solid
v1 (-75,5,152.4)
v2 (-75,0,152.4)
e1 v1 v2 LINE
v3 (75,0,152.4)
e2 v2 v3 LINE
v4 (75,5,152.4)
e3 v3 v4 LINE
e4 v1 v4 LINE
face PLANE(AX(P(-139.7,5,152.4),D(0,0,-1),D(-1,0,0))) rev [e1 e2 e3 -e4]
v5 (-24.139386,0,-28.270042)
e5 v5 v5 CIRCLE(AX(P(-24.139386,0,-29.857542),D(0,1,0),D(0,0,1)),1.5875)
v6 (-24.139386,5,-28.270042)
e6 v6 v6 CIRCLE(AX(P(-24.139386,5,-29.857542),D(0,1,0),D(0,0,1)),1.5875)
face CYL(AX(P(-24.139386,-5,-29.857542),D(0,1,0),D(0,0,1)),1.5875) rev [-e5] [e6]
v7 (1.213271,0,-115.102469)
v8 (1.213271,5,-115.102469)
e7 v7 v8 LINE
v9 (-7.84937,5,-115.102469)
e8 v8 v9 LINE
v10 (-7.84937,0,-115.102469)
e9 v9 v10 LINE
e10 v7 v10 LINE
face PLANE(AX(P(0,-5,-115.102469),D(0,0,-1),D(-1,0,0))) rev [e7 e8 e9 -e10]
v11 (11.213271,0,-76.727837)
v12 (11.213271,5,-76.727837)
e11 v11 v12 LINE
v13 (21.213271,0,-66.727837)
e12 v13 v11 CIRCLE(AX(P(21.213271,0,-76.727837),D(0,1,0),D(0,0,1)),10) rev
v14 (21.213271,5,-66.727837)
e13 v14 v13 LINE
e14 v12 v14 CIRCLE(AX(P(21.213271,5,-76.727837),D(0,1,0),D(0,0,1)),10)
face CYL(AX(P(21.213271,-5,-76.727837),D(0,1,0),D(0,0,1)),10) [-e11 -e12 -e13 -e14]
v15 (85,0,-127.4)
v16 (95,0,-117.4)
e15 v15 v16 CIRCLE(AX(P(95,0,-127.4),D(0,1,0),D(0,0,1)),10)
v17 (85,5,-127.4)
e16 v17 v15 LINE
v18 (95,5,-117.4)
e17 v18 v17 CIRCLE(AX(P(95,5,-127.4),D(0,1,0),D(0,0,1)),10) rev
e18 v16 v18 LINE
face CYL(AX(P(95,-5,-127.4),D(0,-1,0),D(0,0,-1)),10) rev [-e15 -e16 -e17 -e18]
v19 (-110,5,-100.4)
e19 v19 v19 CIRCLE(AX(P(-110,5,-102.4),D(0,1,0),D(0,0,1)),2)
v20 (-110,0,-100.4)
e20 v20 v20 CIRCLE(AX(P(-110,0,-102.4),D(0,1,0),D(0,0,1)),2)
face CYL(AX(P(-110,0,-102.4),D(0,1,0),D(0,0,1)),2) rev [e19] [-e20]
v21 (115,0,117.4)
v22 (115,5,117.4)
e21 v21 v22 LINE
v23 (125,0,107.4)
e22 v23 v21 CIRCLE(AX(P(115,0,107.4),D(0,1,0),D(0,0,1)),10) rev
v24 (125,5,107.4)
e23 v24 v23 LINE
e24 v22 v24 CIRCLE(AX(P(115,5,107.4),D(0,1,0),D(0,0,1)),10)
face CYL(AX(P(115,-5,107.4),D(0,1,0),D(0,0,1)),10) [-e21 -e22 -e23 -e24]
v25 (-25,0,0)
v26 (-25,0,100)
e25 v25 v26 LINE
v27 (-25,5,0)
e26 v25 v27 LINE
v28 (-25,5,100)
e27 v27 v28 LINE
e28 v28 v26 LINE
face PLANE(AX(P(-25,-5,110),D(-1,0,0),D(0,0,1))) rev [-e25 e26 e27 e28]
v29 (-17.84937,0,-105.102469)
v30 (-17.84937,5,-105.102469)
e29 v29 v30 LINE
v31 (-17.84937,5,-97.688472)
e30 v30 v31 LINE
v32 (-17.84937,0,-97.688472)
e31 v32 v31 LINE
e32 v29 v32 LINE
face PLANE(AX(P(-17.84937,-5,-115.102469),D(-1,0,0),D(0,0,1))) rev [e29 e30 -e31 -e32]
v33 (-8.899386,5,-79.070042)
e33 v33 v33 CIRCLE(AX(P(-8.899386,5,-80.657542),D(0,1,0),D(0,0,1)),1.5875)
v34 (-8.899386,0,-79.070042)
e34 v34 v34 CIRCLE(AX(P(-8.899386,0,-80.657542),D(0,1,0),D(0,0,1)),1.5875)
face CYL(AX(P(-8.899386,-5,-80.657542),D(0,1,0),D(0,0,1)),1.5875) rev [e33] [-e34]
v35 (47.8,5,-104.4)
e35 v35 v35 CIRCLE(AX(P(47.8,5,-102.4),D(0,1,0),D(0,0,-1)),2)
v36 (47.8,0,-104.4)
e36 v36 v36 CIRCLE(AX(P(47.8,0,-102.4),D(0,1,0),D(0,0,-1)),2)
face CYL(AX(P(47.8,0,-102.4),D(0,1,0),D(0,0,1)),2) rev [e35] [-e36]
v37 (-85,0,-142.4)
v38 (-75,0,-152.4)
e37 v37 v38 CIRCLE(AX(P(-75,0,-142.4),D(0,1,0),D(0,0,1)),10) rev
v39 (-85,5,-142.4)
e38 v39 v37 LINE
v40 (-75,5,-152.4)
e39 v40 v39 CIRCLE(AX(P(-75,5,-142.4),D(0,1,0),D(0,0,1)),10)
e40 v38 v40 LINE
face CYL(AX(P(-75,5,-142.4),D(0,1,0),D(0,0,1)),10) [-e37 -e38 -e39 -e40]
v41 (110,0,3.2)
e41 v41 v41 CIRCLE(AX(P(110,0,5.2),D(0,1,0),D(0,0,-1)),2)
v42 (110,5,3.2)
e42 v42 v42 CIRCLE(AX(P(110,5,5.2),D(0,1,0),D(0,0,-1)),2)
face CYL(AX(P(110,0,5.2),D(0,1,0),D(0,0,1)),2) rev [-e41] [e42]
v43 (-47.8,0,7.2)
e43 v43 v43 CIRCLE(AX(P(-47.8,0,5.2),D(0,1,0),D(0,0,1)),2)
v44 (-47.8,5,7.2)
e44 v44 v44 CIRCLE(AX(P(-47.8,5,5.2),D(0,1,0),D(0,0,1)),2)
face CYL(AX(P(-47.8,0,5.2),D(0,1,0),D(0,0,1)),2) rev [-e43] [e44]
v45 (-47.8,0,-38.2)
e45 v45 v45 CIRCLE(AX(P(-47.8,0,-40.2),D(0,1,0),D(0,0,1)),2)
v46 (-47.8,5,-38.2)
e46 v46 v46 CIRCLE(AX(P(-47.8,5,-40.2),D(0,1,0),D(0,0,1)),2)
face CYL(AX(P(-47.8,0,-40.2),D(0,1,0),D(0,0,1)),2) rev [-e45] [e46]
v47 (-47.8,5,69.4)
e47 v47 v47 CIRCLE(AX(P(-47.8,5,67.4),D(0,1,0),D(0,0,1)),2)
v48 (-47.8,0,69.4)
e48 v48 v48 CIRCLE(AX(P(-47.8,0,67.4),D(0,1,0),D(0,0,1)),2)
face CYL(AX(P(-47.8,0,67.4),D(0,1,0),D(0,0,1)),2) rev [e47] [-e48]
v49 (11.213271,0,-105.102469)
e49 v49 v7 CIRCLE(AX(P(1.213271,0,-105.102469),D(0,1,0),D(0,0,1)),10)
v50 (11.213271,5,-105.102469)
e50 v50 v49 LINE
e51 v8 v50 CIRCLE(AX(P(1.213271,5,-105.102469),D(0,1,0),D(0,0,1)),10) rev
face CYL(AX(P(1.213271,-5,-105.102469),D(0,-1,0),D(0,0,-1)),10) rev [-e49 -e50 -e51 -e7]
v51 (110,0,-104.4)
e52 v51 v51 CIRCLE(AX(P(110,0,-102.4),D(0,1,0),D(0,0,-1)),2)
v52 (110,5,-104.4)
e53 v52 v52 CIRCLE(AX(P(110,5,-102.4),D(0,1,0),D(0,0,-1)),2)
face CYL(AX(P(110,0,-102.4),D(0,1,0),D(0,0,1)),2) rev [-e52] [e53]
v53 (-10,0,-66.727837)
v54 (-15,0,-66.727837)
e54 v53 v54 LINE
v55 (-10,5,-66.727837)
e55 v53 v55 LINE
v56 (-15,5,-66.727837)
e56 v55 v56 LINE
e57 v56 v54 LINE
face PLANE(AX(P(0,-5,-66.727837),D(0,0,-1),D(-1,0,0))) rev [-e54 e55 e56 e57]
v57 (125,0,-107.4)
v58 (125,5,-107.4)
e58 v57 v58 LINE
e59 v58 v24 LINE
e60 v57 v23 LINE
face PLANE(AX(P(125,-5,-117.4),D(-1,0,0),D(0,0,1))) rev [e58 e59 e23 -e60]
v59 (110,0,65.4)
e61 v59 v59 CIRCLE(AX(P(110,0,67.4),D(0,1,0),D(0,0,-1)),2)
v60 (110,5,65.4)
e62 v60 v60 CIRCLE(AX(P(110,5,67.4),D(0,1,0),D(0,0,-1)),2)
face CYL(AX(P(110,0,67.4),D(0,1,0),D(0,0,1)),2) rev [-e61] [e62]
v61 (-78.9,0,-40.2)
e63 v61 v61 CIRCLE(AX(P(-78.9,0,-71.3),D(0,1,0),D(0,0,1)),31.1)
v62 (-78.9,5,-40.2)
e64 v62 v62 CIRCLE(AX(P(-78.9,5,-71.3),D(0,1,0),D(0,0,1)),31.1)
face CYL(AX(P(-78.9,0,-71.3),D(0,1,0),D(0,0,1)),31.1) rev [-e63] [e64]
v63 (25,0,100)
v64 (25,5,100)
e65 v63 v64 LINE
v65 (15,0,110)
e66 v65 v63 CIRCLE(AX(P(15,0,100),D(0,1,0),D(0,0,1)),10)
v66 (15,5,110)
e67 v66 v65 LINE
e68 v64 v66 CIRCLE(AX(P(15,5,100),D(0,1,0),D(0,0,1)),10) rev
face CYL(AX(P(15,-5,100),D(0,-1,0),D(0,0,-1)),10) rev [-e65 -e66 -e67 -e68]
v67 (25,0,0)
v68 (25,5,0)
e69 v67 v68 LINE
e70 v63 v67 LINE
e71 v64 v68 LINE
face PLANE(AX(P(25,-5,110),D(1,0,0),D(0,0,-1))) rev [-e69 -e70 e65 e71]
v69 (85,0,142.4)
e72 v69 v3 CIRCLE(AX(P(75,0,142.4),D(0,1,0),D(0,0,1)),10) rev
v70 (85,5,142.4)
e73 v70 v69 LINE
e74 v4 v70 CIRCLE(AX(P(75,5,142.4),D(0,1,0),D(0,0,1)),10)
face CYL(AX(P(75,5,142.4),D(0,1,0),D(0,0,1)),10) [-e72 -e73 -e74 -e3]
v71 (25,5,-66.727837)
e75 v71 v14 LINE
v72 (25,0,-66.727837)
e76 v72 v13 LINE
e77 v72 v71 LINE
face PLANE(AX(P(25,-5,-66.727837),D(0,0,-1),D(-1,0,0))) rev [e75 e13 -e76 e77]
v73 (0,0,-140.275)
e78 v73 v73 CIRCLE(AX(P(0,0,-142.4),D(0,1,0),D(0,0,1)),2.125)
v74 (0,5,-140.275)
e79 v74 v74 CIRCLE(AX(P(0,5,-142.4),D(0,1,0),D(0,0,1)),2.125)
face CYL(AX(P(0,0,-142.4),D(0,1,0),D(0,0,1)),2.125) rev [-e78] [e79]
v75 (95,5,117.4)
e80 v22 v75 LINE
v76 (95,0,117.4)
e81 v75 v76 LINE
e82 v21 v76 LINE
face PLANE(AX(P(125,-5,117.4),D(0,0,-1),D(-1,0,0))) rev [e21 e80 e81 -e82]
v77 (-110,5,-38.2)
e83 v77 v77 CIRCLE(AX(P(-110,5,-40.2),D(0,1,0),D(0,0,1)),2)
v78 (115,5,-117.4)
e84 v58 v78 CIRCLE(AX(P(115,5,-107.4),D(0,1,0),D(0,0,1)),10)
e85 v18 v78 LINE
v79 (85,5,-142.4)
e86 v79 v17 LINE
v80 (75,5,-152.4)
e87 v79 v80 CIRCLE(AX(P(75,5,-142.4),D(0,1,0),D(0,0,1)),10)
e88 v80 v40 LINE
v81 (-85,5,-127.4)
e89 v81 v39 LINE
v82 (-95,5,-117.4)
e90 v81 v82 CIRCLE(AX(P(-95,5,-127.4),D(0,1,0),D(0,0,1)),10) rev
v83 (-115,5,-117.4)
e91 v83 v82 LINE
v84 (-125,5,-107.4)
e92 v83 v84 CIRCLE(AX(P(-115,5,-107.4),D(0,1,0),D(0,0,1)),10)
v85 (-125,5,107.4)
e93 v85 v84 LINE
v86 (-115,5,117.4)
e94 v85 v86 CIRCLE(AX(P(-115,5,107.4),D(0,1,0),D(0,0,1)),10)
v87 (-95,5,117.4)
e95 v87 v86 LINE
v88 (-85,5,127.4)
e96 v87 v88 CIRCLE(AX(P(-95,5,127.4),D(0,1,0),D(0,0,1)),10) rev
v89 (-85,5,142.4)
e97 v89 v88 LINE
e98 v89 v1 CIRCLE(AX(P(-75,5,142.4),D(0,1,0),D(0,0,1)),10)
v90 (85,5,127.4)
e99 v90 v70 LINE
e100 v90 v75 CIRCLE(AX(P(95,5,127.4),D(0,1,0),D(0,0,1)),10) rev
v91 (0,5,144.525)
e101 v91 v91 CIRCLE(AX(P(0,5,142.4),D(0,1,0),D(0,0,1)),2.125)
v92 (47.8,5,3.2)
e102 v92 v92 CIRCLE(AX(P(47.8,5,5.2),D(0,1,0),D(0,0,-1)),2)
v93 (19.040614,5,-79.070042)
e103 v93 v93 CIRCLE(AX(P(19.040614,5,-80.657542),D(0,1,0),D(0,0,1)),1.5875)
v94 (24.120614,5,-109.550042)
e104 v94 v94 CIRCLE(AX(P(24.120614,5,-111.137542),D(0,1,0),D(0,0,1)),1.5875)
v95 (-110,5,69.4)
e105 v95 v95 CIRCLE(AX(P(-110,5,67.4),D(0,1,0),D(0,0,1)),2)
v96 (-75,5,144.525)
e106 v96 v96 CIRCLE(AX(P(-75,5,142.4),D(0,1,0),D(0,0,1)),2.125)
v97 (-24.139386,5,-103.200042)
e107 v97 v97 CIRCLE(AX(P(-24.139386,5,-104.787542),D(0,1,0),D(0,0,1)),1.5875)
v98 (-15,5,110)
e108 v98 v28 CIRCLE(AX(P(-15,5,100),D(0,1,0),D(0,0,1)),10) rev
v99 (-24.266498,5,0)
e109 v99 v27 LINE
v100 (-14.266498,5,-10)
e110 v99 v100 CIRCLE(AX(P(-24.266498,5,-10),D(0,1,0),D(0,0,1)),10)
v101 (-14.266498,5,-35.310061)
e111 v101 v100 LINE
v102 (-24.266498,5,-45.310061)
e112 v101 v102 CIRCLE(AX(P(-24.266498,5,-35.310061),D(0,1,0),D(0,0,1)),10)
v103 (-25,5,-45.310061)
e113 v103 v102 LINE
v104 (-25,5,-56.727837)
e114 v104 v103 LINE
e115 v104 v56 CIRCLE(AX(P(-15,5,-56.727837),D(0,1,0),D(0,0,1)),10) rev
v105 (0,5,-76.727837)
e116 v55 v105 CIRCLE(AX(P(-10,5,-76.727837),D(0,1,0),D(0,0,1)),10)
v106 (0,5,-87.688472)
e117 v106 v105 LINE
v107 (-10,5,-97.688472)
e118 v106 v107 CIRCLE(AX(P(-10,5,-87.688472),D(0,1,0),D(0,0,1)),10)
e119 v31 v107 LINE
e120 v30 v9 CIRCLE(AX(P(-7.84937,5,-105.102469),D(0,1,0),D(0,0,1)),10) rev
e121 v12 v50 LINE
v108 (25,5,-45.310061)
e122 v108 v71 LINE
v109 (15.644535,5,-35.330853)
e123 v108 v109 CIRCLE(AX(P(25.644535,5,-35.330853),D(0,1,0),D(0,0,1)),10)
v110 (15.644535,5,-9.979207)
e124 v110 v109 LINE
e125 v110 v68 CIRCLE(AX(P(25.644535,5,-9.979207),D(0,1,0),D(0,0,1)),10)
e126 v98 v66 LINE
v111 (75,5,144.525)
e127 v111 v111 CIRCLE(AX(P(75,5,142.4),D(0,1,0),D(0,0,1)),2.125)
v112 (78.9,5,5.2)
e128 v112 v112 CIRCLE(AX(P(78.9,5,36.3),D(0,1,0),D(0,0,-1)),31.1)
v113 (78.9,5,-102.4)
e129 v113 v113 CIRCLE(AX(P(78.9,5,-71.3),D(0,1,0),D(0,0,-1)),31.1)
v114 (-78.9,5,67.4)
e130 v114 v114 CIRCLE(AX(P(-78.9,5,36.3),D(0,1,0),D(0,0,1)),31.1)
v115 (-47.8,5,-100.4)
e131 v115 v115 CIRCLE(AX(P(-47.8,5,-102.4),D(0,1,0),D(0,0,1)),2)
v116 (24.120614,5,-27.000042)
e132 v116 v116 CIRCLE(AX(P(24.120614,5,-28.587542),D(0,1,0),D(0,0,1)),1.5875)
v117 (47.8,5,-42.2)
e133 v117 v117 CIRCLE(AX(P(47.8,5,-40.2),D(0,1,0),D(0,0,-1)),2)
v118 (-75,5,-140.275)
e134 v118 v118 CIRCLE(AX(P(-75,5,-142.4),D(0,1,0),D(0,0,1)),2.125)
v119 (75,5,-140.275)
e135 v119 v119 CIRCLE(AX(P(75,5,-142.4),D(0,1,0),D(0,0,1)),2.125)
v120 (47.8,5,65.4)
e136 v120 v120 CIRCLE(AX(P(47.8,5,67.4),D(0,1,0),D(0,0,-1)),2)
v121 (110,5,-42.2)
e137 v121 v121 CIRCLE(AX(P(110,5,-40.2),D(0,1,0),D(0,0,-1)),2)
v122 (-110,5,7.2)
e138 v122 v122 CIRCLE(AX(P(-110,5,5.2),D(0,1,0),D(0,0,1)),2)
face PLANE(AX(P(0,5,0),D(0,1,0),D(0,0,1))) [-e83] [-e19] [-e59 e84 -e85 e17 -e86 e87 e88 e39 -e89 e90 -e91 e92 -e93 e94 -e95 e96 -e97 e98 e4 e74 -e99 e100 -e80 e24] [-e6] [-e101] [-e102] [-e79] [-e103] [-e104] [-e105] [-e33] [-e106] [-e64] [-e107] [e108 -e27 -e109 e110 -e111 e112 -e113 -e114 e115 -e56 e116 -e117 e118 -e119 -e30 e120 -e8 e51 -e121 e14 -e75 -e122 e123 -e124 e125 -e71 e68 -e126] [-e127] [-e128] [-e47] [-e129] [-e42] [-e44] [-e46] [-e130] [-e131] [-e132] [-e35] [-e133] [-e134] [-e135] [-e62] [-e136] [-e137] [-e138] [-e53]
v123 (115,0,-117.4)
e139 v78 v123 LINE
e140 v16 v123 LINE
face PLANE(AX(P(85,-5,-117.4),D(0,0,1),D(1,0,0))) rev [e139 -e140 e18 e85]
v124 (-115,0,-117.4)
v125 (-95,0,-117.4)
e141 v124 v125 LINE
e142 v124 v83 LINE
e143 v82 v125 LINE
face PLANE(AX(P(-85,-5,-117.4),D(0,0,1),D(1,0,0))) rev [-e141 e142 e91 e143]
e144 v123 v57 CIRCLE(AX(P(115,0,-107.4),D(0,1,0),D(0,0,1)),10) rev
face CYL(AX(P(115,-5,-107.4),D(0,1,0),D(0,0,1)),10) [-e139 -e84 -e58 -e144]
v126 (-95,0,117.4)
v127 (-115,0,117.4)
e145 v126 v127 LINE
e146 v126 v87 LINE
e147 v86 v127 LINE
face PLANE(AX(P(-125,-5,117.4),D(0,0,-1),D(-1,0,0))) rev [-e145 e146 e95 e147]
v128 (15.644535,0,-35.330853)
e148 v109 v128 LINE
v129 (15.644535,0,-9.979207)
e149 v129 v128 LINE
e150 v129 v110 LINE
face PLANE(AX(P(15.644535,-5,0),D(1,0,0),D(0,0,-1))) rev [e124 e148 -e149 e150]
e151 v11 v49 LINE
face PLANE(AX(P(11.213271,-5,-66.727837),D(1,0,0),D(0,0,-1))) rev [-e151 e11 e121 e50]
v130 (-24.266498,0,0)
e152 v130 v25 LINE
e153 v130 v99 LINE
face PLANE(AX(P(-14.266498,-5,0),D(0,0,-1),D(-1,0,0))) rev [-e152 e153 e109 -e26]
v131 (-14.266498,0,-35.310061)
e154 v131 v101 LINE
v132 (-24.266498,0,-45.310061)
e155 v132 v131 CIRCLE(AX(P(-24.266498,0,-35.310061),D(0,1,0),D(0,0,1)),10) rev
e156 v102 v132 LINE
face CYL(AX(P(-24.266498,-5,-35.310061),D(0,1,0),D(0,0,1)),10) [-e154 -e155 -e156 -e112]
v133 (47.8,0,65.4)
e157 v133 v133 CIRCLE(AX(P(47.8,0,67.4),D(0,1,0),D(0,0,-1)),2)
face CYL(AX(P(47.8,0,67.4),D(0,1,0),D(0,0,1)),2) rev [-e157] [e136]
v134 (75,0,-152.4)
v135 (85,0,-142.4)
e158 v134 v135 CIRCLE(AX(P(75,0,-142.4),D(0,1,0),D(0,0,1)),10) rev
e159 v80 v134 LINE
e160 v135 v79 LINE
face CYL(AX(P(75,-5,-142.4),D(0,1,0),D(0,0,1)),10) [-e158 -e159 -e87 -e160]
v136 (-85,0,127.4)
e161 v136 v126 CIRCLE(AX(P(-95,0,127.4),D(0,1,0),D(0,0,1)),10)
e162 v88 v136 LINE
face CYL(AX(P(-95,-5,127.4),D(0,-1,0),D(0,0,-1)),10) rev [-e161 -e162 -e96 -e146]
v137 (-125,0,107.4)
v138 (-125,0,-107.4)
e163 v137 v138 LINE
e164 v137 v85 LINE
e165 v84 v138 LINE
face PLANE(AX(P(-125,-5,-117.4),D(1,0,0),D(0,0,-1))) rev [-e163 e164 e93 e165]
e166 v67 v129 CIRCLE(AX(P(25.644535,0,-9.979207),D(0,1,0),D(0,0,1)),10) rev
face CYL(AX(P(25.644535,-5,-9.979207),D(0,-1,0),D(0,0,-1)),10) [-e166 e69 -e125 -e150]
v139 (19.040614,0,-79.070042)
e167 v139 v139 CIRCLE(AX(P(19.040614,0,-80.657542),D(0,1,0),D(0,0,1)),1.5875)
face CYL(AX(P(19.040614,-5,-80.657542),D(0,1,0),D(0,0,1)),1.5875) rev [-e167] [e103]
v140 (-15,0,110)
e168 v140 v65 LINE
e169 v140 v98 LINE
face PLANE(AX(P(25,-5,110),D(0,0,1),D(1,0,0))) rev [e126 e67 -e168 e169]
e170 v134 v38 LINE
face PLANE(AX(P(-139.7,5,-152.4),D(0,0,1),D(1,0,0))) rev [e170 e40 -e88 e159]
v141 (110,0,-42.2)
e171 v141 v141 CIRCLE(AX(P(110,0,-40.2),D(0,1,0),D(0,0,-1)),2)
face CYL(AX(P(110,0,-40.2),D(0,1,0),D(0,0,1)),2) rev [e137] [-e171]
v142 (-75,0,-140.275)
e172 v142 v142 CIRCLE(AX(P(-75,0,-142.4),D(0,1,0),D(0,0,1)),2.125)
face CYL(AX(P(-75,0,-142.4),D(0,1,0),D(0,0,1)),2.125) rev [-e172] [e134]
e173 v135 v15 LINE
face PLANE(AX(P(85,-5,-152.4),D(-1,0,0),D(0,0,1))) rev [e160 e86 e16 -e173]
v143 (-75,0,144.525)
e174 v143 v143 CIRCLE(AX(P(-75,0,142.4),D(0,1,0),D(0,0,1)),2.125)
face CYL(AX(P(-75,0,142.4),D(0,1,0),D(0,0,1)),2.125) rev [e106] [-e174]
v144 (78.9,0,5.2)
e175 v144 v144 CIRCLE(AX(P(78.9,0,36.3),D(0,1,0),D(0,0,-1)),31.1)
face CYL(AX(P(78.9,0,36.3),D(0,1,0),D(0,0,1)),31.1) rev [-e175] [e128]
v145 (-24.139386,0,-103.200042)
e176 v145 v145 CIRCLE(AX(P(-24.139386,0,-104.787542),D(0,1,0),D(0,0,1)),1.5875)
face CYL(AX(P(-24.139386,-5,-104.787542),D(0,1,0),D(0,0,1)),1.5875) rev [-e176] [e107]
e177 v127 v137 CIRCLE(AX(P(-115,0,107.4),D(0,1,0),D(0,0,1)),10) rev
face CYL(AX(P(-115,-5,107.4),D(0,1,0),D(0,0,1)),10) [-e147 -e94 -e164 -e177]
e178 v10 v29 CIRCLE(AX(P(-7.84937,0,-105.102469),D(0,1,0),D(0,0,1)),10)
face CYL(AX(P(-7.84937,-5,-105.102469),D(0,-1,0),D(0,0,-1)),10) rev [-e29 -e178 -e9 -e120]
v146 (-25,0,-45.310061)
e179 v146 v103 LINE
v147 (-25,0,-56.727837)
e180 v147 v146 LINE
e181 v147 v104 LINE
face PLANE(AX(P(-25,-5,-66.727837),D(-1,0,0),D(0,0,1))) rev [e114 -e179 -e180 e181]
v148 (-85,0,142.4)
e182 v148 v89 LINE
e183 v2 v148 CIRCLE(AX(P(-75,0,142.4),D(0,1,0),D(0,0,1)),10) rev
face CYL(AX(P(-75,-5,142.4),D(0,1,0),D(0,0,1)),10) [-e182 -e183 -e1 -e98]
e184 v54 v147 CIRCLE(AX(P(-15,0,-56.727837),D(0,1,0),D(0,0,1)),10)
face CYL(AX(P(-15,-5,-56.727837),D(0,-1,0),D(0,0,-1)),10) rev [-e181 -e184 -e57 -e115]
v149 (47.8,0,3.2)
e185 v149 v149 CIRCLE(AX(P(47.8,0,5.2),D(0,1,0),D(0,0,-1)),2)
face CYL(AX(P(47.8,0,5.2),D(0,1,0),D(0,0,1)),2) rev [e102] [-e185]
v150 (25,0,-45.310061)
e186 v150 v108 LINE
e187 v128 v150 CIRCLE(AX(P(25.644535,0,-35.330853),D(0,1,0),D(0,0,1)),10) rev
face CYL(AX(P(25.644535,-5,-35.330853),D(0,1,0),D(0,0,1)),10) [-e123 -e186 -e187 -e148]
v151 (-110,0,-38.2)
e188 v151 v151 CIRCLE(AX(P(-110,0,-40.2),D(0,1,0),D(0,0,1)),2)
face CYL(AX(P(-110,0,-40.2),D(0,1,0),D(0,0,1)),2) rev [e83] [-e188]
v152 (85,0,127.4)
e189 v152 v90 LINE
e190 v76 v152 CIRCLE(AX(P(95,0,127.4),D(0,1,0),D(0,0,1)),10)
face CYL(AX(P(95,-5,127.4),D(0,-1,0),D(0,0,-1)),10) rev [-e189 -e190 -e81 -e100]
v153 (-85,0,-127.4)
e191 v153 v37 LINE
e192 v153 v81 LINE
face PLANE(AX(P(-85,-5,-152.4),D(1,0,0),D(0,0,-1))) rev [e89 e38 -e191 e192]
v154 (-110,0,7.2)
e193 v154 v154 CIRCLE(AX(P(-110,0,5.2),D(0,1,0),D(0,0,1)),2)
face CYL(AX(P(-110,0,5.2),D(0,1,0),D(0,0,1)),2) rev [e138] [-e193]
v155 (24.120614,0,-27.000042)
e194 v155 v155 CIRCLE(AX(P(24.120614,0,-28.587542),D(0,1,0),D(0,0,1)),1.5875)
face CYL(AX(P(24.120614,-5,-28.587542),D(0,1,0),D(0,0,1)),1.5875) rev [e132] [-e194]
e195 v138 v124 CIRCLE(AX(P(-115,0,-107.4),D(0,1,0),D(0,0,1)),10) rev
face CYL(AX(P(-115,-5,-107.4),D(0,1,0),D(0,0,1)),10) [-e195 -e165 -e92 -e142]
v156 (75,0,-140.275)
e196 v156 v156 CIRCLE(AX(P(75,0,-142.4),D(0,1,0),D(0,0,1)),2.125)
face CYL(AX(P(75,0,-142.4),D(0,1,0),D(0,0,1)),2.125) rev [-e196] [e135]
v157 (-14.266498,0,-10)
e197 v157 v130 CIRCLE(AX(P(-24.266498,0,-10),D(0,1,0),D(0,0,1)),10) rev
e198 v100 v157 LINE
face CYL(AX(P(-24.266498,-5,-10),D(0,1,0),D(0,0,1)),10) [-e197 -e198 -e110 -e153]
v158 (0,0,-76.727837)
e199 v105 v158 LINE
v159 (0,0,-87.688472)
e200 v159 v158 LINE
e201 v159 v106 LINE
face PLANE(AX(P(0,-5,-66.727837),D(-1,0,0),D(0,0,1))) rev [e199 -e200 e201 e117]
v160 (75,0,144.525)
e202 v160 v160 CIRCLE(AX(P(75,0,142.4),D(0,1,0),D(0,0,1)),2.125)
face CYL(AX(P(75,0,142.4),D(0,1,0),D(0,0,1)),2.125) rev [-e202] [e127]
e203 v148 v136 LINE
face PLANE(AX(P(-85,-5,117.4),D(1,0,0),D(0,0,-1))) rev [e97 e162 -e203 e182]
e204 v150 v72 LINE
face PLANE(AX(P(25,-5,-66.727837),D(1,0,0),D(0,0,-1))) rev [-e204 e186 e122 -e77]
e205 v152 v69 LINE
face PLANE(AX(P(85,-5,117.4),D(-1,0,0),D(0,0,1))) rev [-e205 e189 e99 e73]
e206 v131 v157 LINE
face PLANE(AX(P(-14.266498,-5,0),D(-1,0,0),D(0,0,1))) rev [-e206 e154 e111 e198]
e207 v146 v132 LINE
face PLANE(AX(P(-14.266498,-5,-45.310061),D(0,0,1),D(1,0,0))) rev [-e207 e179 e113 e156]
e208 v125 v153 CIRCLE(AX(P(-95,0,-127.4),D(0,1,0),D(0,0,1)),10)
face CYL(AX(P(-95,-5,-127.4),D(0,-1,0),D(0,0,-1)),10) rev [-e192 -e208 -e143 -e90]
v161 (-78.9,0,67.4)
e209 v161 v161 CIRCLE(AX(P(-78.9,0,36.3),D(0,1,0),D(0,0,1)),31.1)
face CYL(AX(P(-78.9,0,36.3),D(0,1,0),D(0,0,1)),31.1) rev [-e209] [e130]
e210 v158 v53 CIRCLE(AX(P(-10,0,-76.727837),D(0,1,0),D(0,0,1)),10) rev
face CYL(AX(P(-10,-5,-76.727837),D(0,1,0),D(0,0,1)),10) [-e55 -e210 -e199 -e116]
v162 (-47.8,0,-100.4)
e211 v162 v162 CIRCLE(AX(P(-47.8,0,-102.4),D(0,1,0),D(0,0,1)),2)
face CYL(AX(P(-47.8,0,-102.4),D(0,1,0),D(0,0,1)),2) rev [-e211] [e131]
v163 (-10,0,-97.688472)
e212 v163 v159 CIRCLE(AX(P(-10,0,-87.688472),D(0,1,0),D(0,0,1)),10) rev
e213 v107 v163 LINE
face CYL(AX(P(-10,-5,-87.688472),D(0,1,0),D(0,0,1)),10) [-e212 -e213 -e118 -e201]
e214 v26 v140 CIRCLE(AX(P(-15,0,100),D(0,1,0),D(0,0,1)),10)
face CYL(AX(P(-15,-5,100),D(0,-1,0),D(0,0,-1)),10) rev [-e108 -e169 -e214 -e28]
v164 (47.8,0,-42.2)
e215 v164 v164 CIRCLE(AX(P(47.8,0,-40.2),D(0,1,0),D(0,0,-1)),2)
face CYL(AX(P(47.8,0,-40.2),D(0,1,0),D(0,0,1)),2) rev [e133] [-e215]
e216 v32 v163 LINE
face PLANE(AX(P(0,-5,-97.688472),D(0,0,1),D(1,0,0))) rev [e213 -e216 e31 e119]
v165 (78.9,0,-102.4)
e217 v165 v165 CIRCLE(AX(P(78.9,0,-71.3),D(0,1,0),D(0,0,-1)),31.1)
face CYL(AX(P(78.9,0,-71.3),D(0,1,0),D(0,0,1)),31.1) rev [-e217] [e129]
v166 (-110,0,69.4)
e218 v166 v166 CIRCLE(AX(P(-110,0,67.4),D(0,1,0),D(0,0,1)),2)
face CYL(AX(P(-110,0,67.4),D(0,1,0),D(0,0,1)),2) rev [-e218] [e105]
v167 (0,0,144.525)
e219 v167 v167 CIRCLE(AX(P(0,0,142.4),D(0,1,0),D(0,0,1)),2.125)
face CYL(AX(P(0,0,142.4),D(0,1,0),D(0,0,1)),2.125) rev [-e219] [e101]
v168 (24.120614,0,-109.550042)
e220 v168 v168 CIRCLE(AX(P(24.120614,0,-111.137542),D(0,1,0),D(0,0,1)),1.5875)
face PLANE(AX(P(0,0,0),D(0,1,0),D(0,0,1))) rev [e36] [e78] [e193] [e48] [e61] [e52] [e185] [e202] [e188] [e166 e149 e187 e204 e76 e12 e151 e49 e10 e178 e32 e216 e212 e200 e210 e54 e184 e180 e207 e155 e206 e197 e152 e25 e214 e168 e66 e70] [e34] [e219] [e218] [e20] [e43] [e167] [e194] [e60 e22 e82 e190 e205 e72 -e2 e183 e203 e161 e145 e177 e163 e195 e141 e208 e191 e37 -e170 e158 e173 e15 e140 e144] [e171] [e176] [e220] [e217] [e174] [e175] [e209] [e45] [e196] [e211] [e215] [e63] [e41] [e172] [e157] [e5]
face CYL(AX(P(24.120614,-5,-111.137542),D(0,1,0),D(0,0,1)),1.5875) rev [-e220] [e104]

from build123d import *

# Parameters (mm, degrees)
SKETCH1_W           = 279.4
SKETCH1_H           = 304.8
BOSS_EXTRUDE1_DEPTH = 5
CUT_EXTRUDE1_DEPTH  = 10
SKETCH3_R           = 2.125
CUT_EXTRUDE2_DEPTH  = 198.169368818
SKETCH6_R           = 2
SKETCH6_R_2         = 31.1
CUT_EXTRUDE3_DEPTH  = 198.169368818
SKETCH5_R           = 1.5875
CUT_EXTRUDE4_DEPTH  = 10
FILLET1_R           = 10


with BuildPart() as part:
    # Sketch1 → Boss-Extrude1 (new body)
    with BuildSketch(Plane(origin=(0, 0, 0), x_dir=(1, 0, 0), z_dir=(0, 1, 0))):
        Rectangle(SKETCH1_W, SKETCH1_H)
    extrude(amount=BOSS_EXTRUDE1_DEPTH)

    # Sketch2 → Cut-Extrude1 (cut)
    with BuildSketch(Plane(origin=(0, 5, 0), x_dir=(1, 0, 0), z_dir=(0, 1, 0))):
        Polygon((-139.7, 152.4), (-85, 152.4), (-85, 117.4), (-125, 117.4), (-125, -117.4), (-85, -117.4), (-85, -152.4), (-139.7, -152.4), align=None)
        Polygon((139.7, -152.4), (85, -152.4), (85, -117.4), (125, -117.4), (125, 117.4), (85, 117.4), (85, 152.4), (139.7, 152.4), align=None)
    extrude(amount=-CUT_EXTRUDE1_DEPTH, mode=Mode.SUBTRACT)

    # Sketch3 → Cut-Extrude2 (cut, through all)
    with BuildSketch(Plane(origin=(0, 5, 0), x_dir=(1, 0, 0), z_dir=(0, 1, 0))):
        with Locations(Location((-75, 142.4, 0), (0, 0, 270))):
            Circle(SKETCH3_R)
        with Locations(Location((75, 142.4, 0), (0, 0, 270))):
            Circle(SKETCH3_R)
        with Locations(Location((75, -142.4, 0), (0, 0, 270))):
            Circle(SKETCH3_R)
        with Locations(Location((-75, -142.4, 0), (0, 0, 270))):
            Circle(SKETCH3_R)
        with Locations(Location((0, 142.4, 0), (0, 0, 270))):
            Circle(SKETCH3_R)
        with Locations(Location((0, -142.4, 0), (0, 0, 270))):
            Circle(SKETCH3_R)
    extrude(amount=-CUT_EXTRUDE2_DEPTH, mode=Mode.SUBTRACT)

    # Sketch6 → Cut-Extrude3 (cut, through all)
    with BuildSketch(Plane(origin=(0, 5, 0), x_dir=(1, 0, 0), z_dir=(0, 1, 0))):
        with Locations(Location((-110, 102.4, 0), (0, 0, 270))):
            Circle(SKETCH6_R)
        with Locations(Location((-47.8, 102.4, 0), (0, 0, 270))):
            Circle(SKETCH6_R)
        with Locations(Location((-47.8, 40.2, 0), (0, 0, 270))):
            Circle(SKETCH6_R)
        with Locations(Location((-110, 40.2, 0), (0, 0, 270))):
            Circle(SKETCH6_R)
        with Locations(Location((-110, -5.2, 0), (0, 0, 270))):
            Circle(SKETCH6_R)
        with Locations(Location((-47.8, -5.2, 0), (0, 0, 270))):
            Circle(SKETCH6_R)
        with Locations(Location((-47.8, -67.4, 0), (0, 0, 270))):
            Circle(SKETCH6_R)
        with Locations(Location((-110, -67.4, 0), (0, 0, 270))):
            Circle(SKETCH6_R)
        with Locations(Location((-78.9, 71.3, 0), (0, 0, 270))):
            Circle(SKETCH6_R_2)
        with Locations(Location((-78.9, -36.3, 0), (0, 0, 270))):
            Circle(SKETCH6_R_2)
        with Locations(Location((78.9, -36.3, 0), (0, 0, 90))):
            Circle(SKETCH6_R_2)
        with Locations(Location((78.9, 71.3, 0), (0, 0, 90))):
            Circle(SKETCH6_R_2)
        with Locations(Location((110, -67.4, 0), (0, 0, 90))):
            Circle(SKETCH6_R)
        with Locations(Location((47.8, -67.4, 0), (0, 0, 90))):
            Circle(SKETCH6_R)
        with Locations(Location((47.8, -5.2, 0), (0, 0, 90))):
            Circle(SKETCH6_R)
        with Locations(Location((110, -5.2, 0), (0, 0, 90))):
            Circle(SKETCH6_R)
        with Locations(Location((110, 40.2, 0), (0, 0, 90))):
            Circle(SKETCH6_R)
        with Locations(Location((47.8, 40.2, 0), (0, 0, 90))):
            Circle(SKETCH6_R)
        with Locations(Location((47.8, 102.4, 0), (0, 0, 90))):
            Circle(SKETCH6_R)
        with Locations(Location((110, 102.4, 0), (0, 0, 90))):
            Circle(SKETCH6_R)
    extrude(amount=-CUT_EXTRUDE3_DEPTH, mode=Mode.SUBTRACT)

    # Sketch5 → Cut-Extrude4 (cut)
    with BuildSketch(Plane(origin=(0, 5, 0), x_dir=(1, 0, 0), z_dir=(0, 1, 0))):
        with Locations(Location((24.120614372, 111.137541604, 0), (0, 0, 270))):
            Circle(SKETCH5_R)
        with Locations(Location((-24.139385628, 104.787541604, 0), (0, 0, 270))):
            Circle(SKETCH5_R)
        with Locations(Location((-8.899385628, 80.657541604, 0), (0, 0, 270))):
            Circle(SKETCH5_R)
        with Locations(Location((19.040614372, 80.657541604, 0), (0, 0, 270))):
            Circle(SKETCH5_R)
        with Locations(Location((24.120614372, 28.587541604, 0), (0, 0, 270))):
            Circle(SKETCH5_R)
        with Locations(Location((-24.139385628, 29.857541604, 0), (0, 0, 270))):
            Circle(SKETCH5_R)
        Polygon((0, 66.727836804), (-25, 66.727836804), (-25, 45.310060528), (-14.26649767, 45.310060528), (-14.26649767, 0), (-25, 0), (-25, -110), (25, -110), (25, 0), (15.644534715, 0), (15.644534715, 45.310060528), (25, 45.310060528), (25, 66.727836804), (11.213270658, 66.727836804), (11.213270658, 115.102469427), (0, 115.102469427), (-17.849370469, 115.102469427), (-17.849370469, 97.688471773), (0, 97.688471773), align=None)
    extrude(amount=-CUT_EXTRUDE4_DEPTH, mode=Mode.SUBTRACT)

    # Fillet1
    # the kernel refuses this fillet: 10 mm, written as the material it adds along each edge
    with BuildSketch(Plane(origin=(-85, 5, -117.4), x_dir=(0, 0, -1), z_dir=(0, -1, 0)), Plane(origin=(-85, 5, 117.4), x_dir=(-1, 0, 0), z_dir=(0, -1, 0)), Plane(origin=(-17.849370469, 5, -115.102469427), x_dir=(0, 0, 1), z_dir=(0, -1, 0)), Plane(origin=(11.213270658, 5, -115.102469427), x_dir=(-1, 0, 0), z_dir=(0, -1, 0)), Plane(origin=(25, 5, 110), x_dir=(0, 0, -1), z_dir=(0, -1, 0)), Plane(origin=(-25, 5, 110), x_dir=(1, 0, 0), z_dir=(0, -1, 0))) as fillet1_piece_1:
        with BuildLine():
            CenterArc((FILLET1_R, -FILLET1_R), FILLET1_R, 90, 90)
            Line((0, -FILLET1_R), (0, 0))
            Line((0, 0), (FILLET1_R, 0))
        make_face()
    extrude(amount=5)
    with BuildSketch(Plane(origin=(-25, 5, -66.727836804), x_dir=(1, 0, 0), z_dir=(0, -1, 0)), Plane(origin=(85, 5, 117.4), x_dir=(1, 0, 0), z_dir=(0, -1, 0)), Plane(origin=(85, 5, -117.4), x_dir=(0, 0, -1), z_dir=(0, -1, 0))) as fillet1_piece_2:
        with BuildLine():
            CenterArc((FILLET1_R, FILLET1_R), FILLET1_R, 180, 90)
            Line((0, FILLET1_R), (0, 0))
            Line((0, 0), (FILLET1_R, 0))
        make_face()
    extrude(amount=5)
    # the kernel refuses this fillet: 10 mm, written as the material it takes off along each edge
    with BuildSketch(Plane(origin=(-85, 30, -152.4), x_dir=(1, 0, 0), z_dir=(0, -1, 0)), Plane(origin=(-125, 30, -117.4), x_dir=(1, 0, 0), z_dir=(0, -1, 0)), Plane(origin=(-125, 30, 117.4), x_dir=(0, 0, -1), z_dir=(0, -1, 0)), Plane(origin=(-85, 30, 152.4), x_dir=(0, 0, -1), z_dir=(0, -1, 0)), Plane(origin=(-14.26649767, 30, 0), x_dir=(-1, 0, 0), z_dir=(0, -1, 0)), Plane(origin=(-14.26649767, 30, -45.310060528), x_dir=(0, 0, 1), z_dir=(0, -1, 0)), Plane(origin=(0, 30, -66.727836804), x_dir=(-1, 0, 0), z_dir=(0, -1, 0)), Plane(origin=(0, 30, -97.688471773), x_dir=(0, 0, 1), z_dir=(0, -1, 0)), Plane(origin=(11.213270658, 30, -66.727836804), x_dir=(0, 0, -1), z_dir=(0, -1, 0)), Plane(origin=(85, 30, 152.4), x_dir=(-1, 0, 0), z_dir=(0, -1, 0))) as fillet1_2_piece_1:
        with BuildLine():
            CenterArc((FILLET1_R, FILLET1_R), FILLET1_R, 180, 90)
            Line((0, FILLET1_R), (0, 0))
            Line((0, 0), (FILLET1_R, 0))
        make_face()
    extrude(amount=55, mode=Mode.SUBTRACT)
    with BuildSketch(Plane(origin=(15.644534715, 29.948017832, -45.310060528), x_dir=(1, 0, 0), z_dir=(0, -1, 0))) as fillet1_2_piece_2:
        with BuildLine():
            CenterArc((10, 9.979207133), FILLET1_R, 180, 86.304526435)
            Line((0, 9.979207133), (0, 0))
            Line((0, 0), (9.355465285, 0))
        make_face()
    extrude(amount=54.896035664, mode=Mode.SUBTRACT)
    with BuildSketch(Plane(origin=(15.644534715, 29.948017832, 0), x_dir=(0, 0, -1), z_dir=(0, -1, 0))) as fillet1_2_piece_3:
        with BuildLine():
            CenterArc((9.979207133, 10), FILLET1_R, 183.695473565, 86.304526435)
            Line((0, 9.355465285), (0, 0))
            Line((0, 0), (9.979207133, 0))
        make_face()
    extrude(amount=54.896035664, mode=Mode.SUBTRACT)
    with BuildSketch(Plane(origin=(125, 30, 117.4), x_dir=(0, 0, -1), z_dir=(0, -1, 0)), Plane(origin=(125, 30, -117.4), x_dir=(-1, 0, 0), z_dir=(0, -1, 0)), Plane(origin=(85, 30, -152.4), x_dir=(-1, 0, 0), z_dir=(0, -1, 0))) as fillet1_2_piece_4:
        with BuildLine():
            CenterArc((FILLET1_R, -FILLET1_R), FILLET1_R, 90, 90)
            Line((0, -FILLET1_R), (0, 0))
            Line((0, 0), (FILLET1_R, 0))
        make_face()
    extrude(amount=55, mode=Mode.SUBTRACT)


solid = part.part
